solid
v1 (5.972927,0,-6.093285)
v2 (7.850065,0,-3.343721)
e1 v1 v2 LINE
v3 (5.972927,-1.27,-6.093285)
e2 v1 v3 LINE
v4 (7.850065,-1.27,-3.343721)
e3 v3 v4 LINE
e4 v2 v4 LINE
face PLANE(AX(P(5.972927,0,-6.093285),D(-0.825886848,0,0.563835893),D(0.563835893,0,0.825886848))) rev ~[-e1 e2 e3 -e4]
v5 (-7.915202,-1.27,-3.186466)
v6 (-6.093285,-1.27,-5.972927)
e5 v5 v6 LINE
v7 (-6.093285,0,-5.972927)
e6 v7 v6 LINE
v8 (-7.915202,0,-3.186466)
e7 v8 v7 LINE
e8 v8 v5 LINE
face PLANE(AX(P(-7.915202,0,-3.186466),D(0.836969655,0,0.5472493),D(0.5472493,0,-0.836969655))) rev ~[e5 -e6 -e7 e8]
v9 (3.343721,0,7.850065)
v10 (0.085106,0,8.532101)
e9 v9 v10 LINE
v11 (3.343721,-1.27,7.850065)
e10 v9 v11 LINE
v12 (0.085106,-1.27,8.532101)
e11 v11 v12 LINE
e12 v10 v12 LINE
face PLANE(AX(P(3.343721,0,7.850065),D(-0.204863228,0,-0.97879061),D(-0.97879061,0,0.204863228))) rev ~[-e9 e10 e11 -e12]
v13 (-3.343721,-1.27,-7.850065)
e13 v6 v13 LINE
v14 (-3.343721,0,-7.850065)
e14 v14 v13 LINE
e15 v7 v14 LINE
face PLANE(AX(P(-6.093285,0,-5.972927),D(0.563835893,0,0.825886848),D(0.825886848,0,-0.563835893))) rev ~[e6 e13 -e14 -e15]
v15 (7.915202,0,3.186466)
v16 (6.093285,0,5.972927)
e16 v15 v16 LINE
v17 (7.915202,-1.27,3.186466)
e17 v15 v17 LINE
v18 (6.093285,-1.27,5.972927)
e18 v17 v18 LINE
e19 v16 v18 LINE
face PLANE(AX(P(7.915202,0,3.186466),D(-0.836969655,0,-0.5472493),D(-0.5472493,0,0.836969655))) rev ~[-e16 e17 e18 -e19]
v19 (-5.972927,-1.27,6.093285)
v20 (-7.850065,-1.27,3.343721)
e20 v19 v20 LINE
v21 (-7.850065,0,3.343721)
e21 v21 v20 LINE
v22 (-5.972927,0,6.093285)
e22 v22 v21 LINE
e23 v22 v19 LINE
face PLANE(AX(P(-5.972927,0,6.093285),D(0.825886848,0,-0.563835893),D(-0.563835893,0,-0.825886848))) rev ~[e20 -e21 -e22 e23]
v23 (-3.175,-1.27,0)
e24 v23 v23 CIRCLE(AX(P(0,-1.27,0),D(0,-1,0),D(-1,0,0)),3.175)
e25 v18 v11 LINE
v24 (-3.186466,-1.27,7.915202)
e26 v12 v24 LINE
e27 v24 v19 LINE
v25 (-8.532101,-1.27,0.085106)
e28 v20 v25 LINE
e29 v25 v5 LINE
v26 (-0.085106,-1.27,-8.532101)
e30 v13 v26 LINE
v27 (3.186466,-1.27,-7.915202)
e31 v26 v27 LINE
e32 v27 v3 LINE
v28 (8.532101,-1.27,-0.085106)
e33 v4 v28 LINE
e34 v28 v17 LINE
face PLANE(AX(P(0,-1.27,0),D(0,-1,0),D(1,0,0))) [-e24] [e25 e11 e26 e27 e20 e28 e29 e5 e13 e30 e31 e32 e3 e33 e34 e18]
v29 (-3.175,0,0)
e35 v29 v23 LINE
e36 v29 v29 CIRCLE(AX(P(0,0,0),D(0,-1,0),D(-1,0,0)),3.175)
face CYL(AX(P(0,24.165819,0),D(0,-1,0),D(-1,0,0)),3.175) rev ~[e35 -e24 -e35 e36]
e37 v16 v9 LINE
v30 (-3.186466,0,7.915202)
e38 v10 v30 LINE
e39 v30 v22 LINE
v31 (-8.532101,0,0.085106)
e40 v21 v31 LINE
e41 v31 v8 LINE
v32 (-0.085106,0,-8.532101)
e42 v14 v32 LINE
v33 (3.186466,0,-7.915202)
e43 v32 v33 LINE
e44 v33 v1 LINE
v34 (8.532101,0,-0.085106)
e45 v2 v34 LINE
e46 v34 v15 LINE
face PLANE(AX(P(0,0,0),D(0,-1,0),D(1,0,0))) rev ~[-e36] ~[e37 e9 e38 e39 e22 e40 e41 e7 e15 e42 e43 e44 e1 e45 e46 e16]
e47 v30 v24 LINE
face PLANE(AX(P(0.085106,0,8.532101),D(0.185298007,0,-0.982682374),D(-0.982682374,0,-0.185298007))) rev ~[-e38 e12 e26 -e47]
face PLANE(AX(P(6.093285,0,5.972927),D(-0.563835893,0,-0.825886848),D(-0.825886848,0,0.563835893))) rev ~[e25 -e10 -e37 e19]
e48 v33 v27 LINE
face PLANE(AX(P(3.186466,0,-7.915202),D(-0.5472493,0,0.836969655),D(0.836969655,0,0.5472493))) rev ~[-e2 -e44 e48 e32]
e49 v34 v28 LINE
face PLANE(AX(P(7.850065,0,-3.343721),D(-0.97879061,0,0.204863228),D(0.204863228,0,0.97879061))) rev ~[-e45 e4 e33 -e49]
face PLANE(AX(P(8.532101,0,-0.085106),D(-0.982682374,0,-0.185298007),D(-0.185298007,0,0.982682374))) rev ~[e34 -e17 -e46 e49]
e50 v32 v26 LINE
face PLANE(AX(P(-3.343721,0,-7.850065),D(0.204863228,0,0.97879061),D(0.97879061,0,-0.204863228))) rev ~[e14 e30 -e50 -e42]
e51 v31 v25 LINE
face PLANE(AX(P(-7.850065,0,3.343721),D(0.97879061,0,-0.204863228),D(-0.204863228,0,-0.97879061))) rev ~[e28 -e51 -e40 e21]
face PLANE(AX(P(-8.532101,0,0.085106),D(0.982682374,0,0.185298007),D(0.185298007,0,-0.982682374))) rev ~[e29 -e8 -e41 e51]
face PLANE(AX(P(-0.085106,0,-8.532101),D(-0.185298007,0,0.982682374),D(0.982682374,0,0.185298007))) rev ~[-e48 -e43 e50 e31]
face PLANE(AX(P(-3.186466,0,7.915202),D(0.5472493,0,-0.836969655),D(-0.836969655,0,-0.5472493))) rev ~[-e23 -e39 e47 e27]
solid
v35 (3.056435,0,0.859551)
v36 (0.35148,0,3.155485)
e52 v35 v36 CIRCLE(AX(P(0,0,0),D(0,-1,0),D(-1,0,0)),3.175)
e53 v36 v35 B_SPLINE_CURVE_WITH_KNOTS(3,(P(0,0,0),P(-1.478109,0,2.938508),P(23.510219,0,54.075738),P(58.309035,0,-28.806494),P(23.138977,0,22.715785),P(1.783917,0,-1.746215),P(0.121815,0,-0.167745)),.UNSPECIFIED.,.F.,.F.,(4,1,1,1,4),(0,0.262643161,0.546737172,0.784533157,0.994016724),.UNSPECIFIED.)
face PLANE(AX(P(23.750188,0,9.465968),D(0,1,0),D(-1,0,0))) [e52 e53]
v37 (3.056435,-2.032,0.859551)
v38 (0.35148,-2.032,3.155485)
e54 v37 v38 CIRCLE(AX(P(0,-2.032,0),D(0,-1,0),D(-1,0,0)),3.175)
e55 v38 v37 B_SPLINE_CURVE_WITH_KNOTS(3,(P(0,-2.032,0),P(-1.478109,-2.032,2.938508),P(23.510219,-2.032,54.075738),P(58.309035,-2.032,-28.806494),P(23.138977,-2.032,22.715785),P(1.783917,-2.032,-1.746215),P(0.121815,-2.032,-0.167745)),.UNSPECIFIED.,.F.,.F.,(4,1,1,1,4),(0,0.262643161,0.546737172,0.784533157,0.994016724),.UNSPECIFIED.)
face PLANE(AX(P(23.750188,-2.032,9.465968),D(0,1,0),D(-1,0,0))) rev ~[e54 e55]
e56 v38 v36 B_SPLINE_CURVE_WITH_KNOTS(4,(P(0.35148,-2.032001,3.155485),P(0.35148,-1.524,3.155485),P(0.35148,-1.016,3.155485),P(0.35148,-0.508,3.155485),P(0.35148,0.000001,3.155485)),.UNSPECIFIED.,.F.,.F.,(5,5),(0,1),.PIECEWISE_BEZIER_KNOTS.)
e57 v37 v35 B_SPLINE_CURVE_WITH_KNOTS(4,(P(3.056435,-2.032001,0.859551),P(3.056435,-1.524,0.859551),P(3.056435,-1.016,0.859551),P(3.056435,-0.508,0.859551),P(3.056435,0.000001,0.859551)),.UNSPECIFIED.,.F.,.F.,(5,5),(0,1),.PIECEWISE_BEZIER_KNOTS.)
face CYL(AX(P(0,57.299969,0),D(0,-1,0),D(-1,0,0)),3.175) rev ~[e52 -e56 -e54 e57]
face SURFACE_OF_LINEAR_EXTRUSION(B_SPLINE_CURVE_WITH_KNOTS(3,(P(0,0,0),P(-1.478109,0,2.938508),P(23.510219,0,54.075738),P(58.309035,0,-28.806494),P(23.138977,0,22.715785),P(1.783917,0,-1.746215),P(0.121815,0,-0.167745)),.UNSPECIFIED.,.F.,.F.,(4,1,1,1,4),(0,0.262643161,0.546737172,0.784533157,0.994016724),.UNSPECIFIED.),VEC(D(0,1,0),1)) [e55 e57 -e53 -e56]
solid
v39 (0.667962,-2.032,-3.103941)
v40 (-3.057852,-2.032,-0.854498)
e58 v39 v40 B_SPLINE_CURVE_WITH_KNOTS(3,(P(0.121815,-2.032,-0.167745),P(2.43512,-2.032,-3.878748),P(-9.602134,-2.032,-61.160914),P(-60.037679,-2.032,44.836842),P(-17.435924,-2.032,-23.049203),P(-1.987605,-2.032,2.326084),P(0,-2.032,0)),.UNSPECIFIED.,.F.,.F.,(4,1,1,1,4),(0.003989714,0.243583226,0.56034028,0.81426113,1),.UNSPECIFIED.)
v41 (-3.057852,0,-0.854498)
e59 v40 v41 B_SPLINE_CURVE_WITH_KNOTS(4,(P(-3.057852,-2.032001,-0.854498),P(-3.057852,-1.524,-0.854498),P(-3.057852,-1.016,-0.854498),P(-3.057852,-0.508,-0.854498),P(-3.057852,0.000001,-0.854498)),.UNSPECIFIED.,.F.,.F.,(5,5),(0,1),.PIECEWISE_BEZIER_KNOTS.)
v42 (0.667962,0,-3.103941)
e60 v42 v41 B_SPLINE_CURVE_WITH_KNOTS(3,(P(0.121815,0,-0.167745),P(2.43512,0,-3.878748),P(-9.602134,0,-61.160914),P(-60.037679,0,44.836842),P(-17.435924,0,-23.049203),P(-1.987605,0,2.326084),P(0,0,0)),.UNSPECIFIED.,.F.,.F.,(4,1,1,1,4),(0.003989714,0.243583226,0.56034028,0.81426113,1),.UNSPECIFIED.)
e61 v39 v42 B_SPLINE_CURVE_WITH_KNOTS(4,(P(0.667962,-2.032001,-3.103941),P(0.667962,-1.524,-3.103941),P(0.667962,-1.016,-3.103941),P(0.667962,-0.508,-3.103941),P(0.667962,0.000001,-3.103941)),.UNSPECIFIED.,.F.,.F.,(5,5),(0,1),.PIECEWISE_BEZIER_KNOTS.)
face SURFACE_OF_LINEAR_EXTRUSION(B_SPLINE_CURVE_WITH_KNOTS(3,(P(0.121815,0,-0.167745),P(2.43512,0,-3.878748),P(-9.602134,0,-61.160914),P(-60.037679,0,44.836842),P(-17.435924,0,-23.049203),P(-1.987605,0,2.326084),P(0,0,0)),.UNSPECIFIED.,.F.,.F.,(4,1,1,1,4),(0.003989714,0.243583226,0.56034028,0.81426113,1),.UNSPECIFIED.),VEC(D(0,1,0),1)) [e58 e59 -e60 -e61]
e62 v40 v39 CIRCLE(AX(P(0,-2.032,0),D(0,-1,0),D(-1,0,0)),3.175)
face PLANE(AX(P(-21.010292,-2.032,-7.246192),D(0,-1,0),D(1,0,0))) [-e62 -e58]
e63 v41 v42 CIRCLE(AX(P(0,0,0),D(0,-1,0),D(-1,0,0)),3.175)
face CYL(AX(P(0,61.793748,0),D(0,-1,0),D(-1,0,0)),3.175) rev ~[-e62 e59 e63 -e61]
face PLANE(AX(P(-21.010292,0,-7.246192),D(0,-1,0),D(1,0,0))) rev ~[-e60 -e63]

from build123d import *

# Parameters (mm, degrees)
F2_DEPTH = 2.032
F5_DEPTH = 1.27
F7_D     = 6.35
F7_2_D   = 6.35
F7_3_D   = 6.35


# Not quite as in the source:
# - the program builds the solid bodies; features that only make, move or delete a surface that nothing else refers to are left out


with BuildPart() as f2:
    # F1 (on Front) → F2 (new body)
    with BuildSketch(Plane.XZ):
        with BuildLine():
            add(Edge.make_bspline(
                [(0, 0), (-1.478108938, 2.9385077258), (23.5102189712, 54.0757384866), (58.3090351994, -28.8064935303), (23.1389765698, 22.7157851976), (1.7839165292, -1.7462149518), (0.1218154658, -0.1677448348)],
                knots=[0, 0, 0, 0, 0.262643161, 0.5467371715, 0.7845331571, 0.9940167235, 0.9940167235, 0.9940167235, 0.9940167235], degree=3))
            add(Edge.make_bspline(
                [(0, 0), (0.0426942227, -0.0499648339), (0.0832942879, -0.1059491623), (0.1218154658, -0.1677448348)],
                knots=[0, 0, 0, 0, 0.003989714, 0.003989714, 0.003989714, 0.003989714], degree=3))
        make_face()
    extrude(amount=F2_DEPTH)

    # F7 (through all)
    with Locations(Plane(origin=(0, 0, 0), x_dir=(1, 0, 0), z_dir=(0, 1, 0))):
        with Locations((0, 0)):
            Hole(F7_D / 2)


with BuildPart() as f2b:
    # F1 (on Front) → F2, piece 2 (new body)
    with BuildSketch(Plane.XZ):
        with BuildLine():
            add(Edge.make_bspline(
                [(0.1218154658, -0.1677448348), (0.0743424806, -0.1226605194), (0.0336728147, -0.0669421743), (0, 0)],
                knots=[0.9940167235, 0.9940167235, 0.9940167235, 0.9940167235, 1, 1, 1, 1], degree=3))
            add(Edge.make_bspline(
                [(0.1218154658, -0.1677448348), (2.4351202061, -3.8787482406), (-9.6021342591, -61.1609144488), (-60.037679205, 44.8368415658), (-17.435923871, -23.0492034133), (-1.9876053053, 2.3260844835), (0, 0)],
                knots=[0.003989714, 0.003989714, 0.003989714, 0.003989714, 0.2435832259, 0.5603402805, 0.8142611296, 1, 1, 1, 1], degree=3))
        make_face()
    extrude(amount=F2_DEPTH)

    # F7#2 (through all)
    with Locations(Plane(origin=(0, 0, 0), x_dir=(1, 0, 0), z_dir=(0, 1, 0))):
        with Locations((0, 0)):
            Hole(F7_2_D / 2)


with BuildPart() as f5:
    # F4 (on Front) → F5 (new body)
    with BuildSketch(Plane.XZ):
        Polygon((7.9152016549, 3.1864661835), (6.0932849885, 5.9729274251), (3.3437209183, 7.850064611), (0.0851056492, 8.5321006209), (-3.1864661835, 7.9152016549), (-5.9729274251, 6.0932849885), (-7.850064611, 3.3437209183), (-8.5321006209, 0.0851056492), (-7.9152016549, -3.1864661835), (-6.0932849885, -5.9729274251), (-3.3437209183, -7.850064611), (-0.0851056492, -8.5321006209), (3.1864661835, -7.9152016549), (5.9729274251, -6.0932849885), (7.850064611, -3.3437209183), (8.5321006209, -0.0851056492), align=None)
    extrude(amount=F5_DEPTH)

    # F7#3 (through all)
    with Locations(Plane(origin=(0, 0, 0), x_dir=(1, 0, 0), z_dir=(0, 1, 0))):
        with Locations((0, 0)):
            Hole(F7_3_D / 2)


solid = Compound([f2.part, f2b.part, f5.part])
